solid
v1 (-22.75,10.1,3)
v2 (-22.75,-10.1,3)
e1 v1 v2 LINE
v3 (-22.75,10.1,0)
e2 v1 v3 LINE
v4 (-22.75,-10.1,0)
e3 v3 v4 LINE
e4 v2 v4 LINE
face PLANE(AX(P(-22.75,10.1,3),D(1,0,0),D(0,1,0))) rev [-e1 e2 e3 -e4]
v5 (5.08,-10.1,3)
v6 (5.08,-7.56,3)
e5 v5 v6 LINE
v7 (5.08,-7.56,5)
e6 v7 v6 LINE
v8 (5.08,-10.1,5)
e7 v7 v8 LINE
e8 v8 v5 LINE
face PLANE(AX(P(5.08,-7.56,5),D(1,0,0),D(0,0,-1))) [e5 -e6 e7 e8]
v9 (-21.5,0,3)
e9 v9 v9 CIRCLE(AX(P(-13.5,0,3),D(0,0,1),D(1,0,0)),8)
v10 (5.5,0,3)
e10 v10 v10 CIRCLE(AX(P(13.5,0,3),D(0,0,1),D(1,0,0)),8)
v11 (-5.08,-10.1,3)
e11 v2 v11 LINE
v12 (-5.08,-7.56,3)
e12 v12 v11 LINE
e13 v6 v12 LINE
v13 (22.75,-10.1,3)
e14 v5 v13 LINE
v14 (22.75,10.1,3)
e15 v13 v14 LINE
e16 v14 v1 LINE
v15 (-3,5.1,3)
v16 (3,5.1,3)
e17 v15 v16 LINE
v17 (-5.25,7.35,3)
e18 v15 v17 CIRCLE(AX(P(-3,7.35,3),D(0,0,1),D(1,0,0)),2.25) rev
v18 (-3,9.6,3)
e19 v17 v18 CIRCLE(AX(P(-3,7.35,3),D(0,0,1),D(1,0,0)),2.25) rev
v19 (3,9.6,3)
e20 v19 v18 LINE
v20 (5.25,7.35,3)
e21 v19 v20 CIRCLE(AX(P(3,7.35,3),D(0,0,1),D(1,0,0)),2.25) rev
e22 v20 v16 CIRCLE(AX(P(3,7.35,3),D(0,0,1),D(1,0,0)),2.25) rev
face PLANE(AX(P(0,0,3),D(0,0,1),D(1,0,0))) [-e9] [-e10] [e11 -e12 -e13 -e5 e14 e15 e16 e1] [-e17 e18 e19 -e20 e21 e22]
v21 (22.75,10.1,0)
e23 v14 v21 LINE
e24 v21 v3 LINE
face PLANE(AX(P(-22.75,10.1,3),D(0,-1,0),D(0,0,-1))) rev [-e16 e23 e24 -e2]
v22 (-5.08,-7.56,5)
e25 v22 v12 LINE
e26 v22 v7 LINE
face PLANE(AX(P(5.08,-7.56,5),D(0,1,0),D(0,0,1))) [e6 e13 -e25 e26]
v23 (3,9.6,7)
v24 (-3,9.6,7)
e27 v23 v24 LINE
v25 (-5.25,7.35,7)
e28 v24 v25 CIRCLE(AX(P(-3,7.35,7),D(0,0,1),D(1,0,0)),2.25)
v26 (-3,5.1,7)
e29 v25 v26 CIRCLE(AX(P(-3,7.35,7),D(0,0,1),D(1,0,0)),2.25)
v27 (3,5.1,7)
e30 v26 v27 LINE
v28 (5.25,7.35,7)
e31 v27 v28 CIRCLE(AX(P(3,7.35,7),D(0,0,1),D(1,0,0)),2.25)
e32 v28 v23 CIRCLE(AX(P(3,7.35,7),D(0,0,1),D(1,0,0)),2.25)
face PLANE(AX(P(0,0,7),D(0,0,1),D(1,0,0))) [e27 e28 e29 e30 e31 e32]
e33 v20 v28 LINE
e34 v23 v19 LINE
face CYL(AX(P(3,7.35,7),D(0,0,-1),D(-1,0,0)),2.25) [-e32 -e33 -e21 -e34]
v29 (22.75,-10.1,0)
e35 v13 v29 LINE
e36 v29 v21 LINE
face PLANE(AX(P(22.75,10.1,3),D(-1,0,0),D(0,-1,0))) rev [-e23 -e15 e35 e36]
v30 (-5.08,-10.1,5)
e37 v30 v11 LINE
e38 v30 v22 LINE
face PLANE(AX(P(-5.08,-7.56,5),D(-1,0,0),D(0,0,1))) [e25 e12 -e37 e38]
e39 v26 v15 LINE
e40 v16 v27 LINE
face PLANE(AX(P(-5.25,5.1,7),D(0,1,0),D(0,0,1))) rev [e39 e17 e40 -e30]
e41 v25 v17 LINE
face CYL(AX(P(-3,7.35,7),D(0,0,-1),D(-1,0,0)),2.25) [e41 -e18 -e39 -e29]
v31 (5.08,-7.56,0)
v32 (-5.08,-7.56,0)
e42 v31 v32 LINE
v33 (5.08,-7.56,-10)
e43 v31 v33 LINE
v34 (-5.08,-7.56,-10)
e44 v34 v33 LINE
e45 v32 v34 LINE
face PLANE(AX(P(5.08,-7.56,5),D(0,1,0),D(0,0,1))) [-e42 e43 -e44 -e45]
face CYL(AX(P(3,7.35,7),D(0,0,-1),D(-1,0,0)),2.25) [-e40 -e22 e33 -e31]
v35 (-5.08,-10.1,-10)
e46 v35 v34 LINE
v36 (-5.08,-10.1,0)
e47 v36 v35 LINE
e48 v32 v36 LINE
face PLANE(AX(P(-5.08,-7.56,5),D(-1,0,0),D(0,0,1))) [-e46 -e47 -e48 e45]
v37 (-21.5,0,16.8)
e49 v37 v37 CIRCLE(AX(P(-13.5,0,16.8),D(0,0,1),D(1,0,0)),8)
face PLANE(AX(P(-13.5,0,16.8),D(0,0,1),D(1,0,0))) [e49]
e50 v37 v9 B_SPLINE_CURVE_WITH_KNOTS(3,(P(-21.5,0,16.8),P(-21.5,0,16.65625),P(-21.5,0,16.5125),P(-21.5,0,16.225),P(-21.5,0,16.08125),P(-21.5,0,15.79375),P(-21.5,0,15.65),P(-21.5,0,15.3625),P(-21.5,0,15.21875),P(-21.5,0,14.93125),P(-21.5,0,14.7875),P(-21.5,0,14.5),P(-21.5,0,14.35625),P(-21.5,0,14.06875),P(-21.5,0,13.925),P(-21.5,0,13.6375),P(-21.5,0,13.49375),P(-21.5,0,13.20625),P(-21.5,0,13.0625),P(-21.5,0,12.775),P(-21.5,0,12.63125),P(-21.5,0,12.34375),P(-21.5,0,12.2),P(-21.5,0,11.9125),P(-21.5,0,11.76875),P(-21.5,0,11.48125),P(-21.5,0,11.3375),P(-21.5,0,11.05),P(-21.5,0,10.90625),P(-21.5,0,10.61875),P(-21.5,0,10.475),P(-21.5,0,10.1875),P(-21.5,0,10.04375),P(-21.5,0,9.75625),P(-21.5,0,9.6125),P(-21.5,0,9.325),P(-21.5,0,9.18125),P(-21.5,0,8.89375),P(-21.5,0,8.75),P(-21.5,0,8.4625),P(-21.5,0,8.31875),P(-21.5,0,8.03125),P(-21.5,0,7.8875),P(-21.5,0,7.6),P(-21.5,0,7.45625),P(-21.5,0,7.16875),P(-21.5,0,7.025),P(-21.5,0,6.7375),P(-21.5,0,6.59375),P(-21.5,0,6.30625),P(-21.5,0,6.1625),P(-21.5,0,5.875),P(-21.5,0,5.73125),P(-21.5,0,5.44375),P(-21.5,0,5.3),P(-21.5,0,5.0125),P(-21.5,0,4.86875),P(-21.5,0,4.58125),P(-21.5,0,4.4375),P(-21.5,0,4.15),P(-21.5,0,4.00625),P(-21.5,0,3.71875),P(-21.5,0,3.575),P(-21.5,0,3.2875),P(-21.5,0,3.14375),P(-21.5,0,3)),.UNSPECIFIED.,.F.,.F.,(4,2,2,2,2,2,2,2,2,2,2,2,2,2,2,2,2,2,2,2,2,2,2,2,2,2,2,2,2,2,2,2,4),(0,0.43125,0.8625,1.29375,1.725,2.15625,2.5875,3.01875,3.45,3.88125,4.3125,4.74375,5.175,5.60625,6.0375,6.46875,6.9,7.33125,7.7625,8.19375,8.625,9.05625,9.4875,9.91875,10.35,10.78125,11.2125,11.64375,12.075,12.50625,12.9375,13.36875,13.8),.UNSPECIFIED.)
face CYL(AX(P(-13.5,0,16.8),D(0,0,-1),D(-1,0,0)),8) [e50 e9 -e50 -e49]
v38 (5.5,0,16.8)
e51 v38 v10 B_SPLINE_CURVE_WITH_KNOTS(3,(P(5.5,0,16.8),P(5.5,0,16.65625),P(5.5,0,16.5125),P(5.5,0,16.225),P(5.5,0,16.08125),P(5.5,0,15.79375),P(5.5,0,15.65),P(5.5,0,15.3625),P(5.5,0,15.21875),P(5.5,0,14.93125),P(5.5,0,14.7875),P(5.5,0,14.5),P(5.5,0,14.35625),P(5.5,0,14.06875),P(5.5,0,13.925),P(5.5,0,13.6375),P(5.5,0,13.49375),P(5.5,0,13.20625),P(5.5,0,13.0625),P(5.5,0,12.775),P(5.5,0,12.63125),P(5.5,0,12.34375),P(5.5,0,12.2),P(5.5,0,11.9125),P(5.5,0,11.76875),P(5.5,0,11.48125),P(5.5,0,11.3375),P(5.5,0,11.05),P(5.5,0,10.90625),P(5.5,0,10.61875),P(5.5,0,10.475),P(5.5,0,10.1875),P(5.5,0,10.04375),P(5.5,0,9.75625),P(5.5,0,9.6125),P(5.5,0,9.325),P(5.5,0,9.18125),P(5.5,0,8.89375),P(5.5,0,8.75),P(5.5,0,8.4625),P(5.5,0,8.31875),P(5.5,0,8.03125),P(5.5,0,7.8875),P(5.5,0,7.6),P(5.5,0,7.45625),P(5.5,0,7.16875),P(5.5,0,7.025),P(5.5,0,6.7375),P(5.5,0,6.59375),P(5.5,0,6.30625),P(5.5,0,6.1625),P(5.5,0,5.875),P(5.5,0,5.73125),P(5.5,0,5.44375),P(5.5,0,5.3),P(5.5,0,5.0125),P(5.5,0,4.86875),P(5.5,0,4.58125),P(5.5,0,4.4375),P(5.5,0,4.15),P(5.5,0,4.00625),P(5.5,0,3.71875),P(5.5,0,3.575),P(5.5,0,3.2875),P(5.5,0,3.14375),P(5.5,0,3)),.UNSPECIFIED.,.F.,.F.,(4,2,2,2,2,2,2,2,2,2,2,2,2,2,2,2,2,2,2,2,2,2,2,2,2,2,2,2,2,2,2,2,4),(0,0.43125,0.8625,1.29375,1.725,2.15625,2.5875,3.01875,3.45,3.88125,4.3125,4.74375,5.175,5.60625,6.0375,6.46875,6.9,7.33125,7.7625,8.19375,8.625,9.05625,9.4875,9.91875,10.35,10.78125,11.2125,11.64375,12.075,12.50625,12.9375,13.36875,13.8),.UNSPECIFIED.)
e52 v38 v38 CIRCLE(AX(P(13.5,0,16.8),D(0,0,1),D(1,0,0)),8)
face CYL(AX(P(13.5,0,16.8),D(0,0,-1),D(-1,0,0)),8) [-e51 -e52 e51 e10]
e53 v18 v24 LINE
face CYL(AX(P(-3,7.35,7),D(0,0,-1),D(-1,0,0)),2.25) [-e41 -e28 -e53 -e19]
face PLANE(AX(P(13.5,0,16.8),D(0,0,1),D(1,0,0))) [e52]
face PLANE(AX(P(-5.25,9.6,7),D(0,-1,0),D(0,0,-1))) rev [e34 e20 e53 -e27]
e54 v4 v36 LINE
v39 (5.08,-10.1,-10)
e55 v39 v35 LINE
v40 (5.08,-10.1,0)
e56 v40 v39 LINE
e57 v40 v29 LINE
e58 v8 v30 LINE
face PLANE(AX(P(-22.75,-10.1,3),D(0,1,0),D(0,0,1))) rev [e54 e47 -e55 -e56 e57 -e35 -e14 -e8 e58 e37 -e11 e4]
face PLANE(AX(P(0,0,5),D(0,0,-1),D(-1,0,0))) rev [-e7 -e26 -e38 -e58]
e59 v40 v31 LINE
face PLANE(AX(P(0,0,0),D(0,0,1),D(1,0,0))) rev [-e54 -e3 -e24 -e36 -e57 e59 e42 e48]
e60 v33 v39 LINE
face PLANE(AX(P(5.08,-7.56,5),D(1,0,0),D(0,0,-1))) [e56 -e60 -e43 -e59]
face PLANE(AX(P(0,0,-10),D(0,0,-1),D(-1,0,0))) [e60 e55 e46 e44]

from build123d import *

# Parameters (mm, degrees)
SKETCH1_W                = 45.5
SKETCH1_H                = 20.2
BOSS_EXTRUDE1_DEPTH      = 3
SKETCH2_R                = 8
BOSS_EXTRUDE2_DEPTH      = 13.8
SKETCH3_W                = 10.5
SKETCH3_H                = 4.5
BOSS_EXTRUDE3_DEPTH      = 4
FILLET1_R                = 2.25
BOSS_EXTRUDE4_DEPTH      = 10
BOSS_EXTRUDE4_DEPTH_BACK = 5
SKETCH4_W                = 10.16
SKETCH4_H                = 2.54


with BuildPart() as part:
    # Sketch1 → Boss-Extrude1 (new body)
    with BuildSketch(Plane.XY):
        Rectangle(SKETCH1_W, SKETCH1_H)
    extrude(amount=BOSS_EXTRUDE1_DEPTH)

    # Sketch2 → Boss-Extrude2 (add)
    with BuildSketch(Plane.XY.offset(3)):
        with Locations(Location((-13.5, 0, 0), (0, 0, 180))):
            Circle(SKETCH2_R)
        with Locations(Location((13.5, 0, 0), (0, 0, 180))):
            Circle(SKETCH2_R)
    extrude(amount=BOSS_EXTRUDE2_DEPTH)

    # Sketch3 → Boss-Extrude3 (add)
    with BuildSketch(Plane.XY.offset(3)):
        with Locations((0, 7.35)):
            Rectangle(SKETCH3_W, SKETCH3_H)
    extrude(amount=BOSS_EXTRUDE3_DEPTH)

    # Fillet1
    fillet1_edges = [part.edges().sort_by_distance(p)[0] for p in [
        (-5.25, 5.1, 5),
        (-5.25, 9.6, 5),
        (5.25, 5.1, 5),
        (5.25, 9.6, 5),
    ]]
    fillet(fillet1_edges, radius=FILLET1_R - 0.0001)  # a hair under: the kernel refuses the full size

    # Sketch4 → Boss-Extrude4 (add, two sides: drawn at the far end of the back side and taken through both)
    with BuildSketch(Plane(origin=(0, 0, 0), x_dir=(-1, 0, 0), z_dir=(0, 0, -1)).offset(-BOSS_EXTRUDE4_DEPTH_BACK)):
        with Locations((0, -8.83)):
            Rectangle(SKETCH4_W, SKETCH4_H)
    extrude(amount=BOSS_EXTRUDE4_DEPTH + BOSS_EXTRUDE4_DEPTH_BACK)


solid = part.part
